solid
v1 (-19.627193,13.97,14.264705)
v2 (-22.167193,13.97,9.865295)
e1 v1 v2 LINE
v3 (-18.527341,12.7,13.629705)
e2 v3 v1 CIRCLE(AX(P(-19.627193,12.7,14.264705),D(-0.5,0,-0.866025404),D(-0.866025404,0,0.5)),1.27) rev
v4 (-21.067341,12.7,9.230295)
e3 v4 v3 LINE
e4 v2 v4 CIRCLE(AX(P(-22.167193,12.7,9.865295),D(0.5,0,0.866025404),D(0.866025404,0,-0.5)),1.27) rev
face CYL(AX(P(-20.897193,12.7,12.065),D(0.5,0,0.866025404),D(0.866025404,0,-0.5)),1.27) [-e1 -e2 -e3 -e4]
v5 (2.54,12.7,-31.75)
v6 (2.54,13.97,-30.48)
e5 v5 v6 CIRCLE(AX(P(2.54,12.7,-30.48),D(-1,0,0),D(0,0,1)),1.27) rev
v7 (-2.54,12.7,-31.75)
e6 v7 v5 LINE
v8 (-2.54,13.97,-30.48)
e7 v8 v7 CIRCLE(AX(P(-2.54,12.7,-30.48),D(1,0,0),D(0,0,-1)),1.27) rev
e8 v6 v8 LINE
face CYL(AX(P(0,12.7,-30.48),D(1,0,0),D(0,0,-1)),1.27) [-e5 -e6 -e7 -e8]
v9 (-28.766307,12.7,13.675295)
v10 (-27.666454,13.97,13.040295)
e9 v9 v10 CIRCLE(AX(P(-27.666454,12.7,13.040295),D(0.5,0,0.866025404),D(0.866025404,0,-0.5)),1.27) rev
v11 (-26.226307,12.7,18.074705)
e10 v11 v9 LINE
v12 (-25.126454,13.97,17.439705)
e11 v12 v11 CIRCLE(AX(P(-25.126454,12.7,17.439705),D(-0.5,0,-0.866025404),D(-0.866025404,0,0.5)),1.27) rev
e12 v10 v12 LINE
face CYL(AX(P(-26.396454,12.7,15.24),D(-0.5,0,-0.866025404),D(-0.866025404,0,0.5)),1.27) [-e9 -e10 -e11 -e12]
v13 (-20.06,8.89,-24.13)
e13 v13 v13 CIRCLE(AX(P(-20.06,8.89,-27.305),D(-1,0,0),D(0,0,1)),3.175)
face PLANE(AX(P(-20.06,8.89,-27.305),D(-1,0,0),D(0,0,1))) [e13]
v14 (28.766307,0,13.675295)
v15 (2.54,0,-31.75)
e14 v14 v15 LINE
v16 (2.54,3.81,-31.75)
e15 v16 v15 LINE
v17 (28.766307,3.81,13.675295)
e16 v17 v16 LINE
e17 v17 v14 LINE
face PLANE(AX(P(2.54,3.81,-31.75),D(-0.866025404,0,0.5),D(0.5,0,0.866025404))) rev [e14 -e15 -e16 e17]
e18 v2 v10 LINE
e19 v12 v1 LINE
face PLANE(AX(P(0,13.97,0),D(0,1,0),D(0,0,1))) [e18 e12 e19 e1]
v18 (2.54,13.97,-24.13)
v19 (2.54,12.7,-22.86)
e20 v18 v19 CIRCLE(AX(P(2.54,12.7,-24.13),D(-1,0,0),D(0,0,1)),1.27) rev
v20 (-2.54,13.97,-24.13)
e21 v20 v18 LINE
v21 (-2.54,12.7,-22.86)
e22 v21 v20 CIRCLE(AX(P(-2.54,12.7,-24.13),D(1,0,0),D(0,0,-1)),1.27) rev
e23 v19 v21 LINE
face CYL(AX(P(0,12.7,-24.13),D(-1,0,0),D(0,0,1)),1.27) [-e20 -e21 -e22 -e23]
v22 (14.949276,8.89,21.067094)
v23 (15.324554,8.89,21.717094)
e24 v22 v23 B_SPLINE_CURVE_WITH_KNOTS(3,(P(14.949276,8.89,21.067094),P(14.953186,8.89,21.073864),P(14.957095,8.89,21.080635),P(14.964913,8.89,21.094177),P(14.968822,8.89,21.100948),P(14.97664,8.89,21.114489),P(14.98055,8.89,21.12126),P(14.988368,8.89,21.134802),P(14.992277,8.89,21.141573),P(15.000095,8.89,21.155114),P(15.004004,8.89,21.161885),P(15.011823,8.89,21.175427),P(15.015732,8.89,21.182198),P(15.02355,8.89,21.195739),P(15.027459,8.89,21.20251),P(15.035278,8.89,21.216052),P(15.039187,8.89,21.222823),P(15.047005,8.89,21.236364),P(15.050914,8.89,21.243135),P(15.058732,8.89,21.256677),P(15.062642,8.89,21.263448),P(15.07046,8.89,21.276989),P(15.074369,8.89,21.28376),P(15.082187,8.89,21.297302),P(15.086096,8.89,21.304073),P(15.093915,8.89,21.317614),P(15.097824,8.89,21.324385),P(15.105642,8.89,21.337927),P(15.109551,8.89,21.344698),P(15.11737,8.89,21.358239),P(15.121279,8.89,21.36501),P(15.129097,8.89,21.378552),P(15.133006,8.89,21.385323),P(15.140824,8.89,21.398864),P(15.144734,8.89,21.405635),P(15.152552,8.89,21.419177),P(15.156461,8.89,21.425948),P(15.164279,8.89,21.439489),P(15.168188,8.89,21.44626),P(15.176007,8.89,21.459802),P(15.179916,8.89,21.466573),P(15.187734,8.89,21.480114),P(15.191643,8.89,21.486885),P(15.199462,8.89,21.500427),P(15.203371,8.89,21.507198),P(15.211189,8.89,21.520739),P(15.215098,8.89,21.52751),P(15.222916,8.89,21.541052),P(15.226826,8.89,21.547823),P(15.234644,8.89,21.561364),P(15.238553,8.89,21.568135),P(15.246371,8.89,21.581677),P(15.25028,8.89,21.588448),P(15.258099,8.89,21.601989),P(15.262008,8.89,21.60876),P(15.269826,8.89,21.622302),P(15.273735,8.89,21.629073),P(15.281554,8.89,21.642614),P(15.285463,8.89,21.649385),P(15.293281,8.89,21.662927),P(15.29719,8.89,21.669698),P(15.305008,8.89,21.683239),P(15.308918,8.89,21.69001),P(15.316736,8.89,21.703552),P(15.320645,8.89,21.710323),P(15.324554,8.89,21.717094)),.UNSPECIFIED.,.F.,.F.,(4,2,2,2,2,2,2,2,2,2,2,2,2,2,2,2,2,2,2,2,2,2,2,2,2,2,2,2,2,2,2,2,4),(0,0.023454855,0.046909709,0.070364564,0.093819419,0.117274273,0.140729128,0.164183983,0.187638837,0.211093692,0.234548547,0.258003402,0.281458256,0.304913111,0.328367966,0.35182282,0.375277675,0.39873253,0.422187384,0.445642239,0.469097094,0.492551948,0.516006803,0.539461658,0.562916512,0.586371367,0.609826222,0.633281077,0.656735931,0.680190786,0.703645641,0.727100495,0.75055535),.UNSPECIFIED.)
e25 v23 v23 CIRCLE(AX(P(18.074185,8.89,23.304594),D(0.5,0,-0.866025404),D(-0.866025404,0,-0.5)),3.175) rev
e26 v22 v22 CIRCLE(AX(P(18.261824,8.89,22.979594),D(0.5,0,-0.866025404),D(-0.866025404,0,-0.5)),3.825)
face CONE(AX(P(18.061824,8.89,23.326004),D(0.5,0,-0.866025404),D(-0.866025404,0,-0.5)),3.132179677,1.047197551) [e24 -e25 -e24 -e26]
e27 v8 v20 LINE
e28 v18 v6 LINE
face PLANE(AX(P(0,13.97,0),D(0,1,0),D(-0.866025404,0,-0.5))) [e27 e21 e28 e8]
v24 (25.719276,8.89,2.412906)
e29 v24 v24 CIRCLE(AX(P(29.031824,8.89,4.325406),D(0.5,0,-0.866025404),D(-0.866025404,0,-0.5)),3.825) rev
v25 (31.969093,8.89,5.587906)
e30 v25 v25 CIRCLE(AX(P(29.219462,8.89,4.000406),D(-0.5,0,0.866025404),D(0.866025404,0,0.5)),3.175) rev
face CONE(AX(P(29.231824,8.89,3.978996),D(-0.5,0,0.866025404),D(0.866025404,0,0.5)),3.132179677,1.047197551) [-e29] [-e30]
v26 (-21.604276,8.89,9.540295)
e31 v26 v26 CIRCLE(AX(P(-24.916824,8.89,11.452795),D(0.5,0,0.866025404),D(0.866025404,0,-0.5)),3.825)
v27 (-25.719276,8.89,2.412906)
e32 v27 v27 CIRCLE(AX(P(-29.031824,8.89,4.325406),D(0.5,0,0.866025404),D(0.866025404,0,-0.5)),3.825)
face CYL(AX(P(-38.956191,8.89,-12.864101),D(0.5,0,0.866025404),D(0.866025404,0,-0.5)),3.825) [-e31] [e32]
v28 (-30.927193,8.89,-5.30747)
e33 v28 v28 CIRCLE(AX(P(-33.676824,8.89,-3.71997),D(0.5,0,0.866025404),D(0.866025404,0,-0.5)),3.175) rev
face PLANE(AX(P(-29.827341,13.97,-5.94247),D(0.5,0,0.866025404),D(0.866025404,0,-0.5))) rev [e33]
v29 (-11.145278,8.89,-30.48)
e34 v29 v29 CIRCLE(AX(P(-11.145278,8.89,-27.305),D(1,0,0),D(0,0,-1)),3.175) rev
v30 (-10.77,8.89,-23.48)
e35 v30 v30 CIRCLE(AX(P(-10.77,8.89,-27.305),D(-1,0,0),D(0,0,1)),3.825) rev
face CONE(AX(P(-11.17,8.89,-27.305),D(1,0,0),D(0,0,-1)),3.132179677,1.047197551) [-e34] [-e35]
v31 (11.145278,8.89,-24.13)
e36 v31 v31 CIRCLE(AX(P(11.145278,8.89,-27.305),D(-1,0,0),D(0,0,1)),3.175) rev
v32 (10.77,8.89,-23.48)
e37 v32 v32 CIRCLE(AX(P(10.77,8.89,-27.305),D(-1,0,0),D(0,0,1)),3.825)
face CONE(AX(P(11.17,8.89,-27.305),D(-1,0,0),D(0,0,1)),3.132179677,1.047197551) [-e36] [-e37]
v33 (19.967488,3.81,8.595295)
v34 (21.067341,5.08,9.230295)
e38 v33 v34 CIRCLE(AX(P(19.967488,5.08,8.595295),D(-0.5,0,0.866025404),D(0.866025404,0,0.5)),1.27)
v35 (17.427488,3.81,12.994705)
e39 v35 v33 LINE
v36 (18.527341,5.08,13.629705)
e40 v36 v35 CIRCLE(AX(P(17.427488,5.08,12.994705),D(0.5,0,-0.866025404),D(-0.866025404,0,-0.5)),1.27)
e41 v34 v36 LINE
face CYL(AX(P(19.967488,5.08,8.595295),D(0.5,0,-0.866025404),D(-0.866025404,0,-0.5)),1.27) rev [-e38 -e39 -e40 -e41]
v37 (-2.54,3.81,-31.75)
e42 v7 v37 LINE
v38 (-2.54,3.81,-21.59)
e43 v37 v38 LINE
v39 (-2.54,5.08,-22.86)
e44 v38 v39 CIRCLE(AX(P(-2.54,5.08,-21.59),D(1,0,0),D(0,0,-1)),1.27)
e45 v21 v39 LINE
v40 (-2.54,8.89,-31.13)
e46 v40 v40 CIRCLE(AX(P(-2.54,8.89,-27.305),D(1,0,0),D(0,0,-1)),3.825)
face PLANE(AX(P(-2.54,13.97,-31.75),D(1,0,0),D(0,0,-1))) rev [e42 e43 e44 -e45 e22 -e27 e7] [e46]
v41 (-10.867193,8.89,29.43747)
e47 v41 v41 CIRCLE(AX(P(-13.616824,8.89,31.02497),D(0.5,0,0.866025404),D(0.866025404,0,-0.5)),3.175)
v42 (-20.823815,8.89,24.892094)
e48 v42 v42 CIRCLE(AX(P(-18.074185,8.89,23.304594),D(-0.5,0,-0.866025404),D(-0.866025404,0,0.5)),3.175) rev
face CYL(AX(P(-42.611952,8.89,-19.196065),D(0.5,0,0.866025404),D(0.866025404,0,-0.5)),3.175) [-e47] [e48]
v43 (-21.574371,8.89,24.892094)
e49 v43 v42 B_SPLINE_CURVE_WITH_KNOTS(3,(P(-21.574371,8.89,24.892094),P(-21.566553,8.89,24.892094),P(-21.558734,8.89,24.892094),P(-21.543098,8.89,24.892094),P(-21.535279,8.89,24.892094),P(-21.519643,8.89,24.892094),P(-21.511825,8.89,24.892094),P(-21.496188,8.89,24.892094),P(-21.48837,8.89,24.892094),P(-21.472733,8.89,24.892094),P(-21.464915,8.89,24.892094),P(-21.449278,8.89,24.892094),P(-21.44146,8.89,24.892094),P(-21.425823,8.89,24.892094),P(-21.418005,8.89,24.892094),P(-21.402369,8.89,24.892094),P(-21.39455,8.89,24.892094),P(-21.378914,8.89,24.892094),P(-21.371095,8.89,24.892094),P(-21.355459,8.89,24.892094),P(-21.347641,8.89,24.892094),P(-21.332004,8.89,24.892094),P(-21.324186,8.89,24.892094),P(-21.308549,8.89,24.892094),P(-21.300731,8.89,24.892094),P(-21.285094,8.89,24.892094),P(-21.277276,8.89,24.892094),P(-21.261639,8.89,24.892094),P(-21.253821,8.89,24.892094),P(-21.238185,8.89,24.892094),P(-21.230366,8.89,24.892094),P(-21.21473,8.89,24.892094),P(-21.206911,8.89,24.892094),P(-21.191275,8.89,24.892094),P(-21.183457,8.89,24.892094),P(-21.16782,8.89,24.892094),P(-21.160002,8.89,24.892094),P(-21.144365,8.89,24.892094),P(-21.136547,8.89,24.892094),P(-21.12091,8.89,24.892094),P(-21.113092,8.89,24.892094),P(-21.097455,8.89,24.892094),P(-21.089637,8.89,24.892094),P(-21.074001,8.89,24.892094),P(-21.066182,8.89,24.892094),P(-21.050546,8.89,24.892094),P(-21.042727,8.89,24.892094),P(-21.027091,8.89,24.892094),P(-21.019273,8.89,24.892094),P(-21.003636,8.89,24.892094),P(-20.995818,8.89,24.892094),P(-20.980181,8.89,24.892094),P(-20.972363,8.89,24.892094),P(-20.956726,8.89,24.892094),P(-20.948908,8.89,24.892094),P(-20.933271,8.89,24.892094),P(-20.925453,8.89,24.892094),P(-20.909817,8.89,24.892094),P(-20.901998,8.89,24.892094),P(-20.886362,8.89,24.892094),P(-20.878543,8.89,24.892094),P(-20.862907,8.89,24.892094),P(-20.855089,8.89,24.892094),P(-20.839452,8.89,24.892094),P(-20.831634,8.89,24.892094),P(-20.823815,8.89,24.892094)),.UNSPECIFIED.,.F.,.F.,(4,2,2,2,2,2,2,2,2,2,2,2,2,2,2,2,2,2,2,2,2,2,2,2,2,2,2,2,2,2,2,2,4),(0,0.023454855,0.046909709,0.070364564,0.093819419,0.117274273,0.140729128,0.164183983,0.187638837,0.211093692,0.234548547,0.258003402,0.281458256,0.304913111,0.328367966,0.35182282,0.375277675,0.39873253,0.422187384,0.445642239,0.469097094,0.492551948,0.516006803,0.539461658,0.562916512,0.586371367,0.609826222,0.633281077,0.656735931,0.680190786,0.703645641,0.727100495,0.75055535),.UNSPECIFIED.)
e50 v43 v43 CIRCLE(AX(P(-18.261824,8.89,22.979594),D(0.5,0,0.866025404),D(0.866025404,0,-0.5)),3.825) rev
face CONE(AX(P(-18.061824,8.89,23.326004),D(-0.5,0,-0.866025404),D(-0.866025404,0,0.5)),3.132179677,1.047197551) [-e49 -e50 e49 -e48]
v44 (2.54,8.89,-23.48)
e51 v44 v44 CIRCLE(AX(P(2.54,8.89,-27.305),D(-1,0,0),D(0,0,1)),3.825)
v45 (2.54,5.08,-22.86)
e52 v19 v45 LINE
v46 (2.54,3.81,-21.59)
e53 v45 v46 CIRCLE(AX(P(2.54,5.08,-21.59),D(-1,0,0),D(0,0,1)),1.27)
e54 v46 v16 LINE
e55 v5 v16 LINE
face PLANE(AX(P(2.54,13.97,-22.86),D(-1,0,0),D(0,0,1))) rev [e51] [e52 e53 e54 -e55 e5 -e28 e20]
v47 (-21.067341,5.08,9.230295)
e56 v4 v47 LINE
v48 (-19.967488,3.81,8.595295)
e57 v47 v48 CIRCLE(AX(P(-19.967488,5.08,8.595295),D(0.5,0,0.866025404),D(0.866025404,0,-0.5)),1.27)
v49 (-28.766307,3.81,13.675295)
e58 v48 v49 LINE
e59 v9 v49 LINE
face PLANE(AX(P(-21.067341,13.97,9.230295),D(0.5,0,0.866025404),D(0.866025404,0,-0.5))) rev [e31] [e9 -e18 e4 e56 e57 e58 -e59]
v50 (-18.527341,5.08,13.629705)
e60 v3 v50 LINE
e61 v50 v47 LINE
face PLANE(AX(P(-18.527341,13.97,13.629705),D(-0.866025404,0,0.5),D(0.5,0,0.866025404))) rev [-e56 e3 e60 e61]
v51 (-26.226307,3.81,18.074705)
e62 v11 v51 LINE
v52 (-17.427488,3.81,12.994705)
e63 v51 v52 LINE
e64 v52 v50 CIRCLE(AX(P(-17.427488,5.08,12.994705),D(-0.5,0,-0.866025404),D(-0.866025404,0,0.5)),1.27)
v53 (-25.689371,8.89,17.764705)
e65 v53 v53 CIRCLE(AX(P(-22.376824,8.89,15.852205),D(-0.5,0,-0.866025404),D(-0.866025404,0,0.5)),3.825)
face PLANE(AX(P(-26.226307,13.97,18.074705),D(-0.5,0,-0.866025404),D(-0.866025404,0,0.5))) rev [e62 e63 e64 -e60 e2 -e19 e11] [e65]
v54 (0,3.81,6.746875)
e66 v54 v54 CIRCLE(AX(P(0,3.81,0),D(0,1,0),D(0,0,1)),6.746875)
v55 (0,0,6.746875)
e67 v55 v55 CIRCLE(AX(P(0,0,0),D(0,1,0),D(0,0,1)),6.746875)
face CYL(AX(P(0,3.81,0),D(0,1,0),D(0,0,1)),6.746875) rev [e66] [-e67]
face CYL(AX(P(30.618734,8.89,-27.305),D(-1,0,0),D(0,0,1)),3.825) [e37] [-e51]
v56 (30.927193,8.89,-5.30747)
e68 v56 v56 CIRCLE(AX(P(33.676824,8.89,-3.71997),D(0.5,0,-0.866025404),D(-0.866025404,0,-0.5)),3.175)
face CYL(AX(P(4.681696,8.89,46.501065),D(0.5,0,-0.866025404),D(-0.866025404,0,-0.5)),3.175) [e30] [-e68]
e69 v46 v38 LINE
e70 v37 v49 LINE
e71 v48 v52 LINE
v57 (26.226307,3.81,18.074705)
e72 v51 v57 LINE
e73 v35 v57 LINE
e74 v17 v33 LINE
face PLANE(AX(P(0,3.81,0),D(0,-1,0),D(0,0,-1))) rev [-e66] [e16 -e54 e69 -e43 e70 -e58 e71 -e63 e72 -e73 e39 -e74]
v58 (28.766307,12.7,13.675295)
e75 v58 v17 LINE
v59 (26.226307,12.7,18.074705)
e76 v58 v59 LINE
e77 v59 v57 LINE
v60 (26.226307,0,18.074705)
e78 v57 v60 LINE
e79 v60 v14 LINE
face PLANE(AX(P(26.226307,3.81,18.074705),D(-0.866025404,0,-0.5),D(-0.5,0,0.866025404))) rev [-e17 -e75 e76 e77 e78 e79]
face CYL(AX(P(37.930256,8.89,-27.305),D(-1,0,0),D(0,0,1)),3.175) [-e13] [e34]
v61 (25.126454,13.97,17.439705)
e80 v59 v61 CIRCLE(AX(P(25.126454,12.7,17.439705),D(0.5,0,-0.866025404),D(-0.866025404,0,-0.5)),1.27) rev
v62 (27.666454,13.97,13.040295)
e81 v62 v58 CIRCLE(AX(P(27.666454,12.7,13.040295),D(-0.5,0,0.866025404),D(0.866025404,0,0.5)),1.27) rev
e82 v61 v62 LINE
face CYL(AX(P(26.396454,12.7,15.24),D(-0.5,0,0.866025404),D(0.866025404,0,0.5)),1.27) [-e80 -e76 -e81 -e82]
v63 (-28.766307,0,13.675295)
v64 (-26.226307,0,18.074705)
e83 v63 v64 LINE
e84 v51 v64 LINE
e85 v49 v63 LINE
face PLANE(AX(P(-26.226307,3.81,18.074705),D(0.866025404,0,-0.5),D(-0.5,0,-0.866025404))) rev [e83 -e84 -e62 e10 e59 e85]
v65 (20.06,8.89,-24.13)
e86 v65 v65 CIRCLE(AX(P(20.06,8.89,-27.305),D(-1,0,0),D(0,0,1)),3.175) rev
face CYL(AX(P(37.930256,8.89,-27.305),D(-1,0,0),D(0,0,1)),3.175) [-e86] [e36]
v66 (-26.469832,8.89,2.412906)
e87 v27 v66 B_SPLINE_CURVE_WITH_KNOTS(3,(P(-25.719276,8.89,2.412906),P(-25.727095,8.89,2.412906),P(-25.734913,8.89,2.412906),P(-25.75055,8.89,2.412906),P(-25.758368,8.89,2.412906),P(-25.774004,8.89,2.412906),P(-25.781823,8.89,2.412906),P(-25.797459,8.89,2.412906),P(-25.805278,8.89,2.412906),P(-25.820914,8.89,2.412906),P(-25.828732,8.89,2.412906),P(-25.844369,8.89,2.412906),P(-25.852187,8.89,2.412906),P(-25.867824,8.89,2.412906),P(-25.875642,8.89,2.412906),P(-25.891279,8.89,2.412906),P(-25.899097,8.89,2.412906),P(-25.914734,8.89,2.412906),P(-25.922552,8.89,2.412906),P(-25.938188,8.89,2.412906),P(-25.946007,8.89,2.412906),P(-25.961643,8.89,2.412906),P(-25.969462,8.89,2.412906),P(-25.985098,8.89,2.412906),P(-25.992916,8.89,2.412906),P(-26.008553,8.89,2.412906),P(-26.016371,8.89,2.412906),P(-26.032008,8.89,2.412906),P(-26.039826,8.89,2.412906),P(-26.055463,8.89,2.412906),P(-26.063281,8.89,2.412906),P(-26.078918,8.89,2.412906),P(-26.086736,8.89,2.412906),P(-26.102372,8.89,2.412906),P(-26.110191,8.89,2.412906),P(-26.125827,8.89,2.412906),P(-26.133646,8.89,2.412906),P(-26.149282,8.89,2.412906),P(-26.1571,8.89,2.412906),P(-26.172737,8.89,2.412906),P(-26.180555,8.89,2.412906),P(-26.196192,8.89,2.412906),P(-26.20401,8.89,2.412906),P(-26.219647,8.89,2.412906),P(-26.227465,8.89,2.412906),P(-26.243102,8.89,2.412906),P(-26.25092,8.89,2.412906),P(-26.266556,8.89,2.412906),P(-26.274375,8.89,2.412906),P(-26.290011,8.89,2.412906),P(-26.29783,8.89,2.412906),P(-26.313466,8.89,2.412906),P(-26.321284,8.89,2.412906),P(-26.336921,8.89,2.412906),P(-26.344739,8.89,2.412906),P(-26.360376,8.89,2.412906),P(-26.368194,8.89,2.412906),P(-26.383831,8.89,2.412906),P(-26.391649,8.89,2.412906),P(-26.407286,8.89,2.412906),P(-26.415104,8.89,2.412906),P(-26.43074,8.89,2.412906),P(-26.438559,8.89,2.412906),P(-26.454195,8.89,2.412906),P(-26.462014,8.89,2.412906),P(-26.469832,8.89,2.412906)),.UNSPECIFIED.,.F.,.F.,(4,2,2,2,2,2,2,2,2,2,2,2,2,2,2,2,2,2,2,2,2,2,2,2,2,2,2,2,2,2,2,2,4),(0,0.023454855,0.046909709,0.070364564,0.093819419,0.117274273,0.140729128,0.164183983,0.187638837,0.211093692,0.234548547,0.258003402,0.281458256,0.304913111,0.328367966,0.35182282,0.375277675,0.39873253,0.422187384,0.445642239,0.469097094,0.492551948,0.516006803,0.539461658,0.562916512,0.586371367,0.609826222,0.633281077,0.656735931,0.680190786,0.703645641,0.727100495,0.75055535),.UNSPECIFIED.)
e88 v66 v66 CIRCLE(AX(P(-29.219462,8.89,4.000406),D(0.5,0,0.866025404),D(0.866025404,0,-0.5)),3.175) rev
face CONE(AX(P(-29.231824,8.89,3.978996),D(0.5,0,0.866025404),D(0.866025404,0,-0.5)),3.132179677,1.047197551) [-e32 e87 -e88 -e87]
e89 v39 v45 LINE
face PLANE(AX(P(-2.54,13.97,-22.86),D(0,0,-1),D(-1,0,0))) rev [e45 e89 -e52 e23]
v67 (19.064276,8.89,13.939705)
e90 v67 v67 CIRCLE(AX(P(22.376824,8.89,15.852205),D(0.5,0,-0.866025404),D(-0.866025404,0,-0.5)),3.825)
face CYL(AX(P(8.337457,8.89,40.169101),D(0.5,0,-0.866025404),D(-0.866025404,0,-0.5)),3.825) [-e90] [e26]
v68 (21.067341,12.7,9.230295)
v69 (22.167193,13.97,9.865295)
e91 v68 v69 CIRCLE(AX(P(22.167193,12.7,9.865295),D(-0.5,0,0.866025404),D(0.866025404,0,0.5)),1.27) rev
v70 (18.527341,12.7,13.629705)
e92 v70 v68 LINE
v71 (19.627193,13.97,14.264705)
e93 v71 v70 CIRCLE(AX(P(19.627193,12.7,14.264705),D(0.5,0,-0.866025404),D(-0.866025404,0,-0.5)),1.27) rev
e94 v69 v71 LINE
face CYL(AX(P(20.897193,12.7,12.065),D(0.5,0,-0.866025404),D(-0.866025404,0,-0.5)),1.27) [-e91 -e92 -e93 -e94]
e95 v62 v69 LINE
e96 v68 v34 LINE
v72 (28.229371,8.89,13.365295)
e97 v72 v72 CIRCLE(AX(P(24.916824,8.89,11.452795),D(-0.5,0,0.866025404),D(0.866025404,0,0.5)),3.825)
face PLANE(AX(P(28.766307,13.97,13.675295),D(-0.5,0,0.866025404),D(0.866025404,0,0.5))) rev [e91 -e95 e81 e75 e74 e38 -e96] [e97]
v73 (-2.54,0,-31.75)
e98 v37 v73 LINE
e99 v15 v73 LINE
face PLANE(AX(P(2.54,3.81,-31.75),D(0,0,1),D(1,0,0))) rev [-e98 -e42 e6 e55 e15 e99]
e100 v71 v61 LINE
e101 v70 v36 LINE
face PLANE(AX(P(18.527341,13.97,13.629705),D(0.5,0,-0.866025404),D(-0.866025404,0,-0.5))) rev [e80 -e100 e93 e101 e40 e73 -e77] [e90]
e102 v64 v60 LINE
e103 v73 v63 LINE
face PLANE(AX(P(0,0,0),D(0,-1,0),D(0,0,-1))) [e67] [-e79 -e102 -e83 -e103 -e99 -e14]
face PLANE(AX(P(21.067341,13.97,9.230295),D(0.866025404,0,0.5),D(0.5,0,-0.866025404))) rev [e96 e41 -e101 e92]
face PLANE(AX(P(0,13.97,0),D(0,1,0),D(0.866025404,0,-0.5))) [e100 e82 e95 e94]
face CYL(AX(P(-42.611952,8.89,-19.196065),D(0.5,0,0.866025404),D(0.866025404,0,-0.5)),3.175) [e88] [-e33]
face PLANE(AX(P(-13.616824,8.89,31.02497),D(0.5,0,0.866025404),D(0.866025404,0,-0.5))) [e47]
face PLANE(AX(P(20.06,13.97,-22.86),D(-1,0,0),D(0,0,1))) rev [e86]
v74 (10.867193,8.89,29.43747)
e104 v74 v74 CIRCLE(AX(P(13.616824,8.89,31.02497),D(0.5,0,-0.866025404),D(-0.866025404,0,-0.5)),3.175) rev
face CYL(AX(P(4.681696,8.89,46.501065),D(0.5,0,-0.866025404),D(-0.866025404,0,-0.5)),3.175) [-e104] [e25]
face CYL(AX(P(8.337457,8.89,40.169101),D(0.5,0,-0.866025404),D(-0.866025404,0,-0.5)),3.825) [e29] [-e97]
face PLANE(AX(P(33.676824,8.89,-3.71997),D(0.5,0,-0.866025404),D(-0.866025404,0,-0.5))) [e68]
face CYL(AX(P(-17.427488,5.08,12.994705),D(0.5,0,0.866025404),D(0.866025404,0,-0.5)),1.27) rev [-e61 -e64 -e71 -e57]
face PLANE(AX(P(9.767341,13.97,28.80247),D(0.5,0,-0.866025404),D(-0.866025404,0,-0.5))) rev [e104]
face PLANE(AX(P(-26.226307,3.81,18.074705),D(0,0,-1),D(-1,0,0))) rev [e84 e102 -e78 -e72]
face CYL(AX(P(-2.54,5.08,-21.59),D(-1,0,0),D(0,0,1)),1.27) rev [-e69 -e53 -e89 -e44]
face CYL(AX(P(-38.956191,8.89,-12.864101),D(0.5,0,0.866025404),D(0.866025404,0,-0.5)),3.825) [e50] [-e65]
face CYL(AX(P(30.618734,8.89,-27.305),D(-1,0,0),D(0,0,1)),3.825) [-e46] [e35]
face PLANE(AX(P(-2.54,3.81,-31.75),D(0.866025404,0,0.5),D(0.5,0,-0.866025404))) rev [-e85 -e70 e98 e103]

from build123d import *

# Parameters (mm, degrees)
BOSS_EXTRUDE1_DEPTH              = 3.81
F_17_32_0_53125_DIAMETER_HOLE1_D = 13.49375
BOSS_EXTRUDE2_DEPTH              = 10.16
CIRPATTERN19_COUNT               = 3
BOSS_EXTRUDE3_START              = -13.71
SKETCH6_R                        = 3.825
BOSS_EXTRUDE3_DEPTH              = 22.34
BOSS_EXTRUDE4_START              = -31.23
SKETCH7_R                        = 3.175
BOSS_EXTRUDE4_DEPTH              = 40.12
CIRPATTERN21_COUNT               = 3
CIRPATTERN28_COUNT               = 3
CHAMFER3_SIZE                    = 0.4
CHAMFER3_SIZE_2                  = 0.692820323
FILLET4_R                        = 1.27


with BuildPart() as part:
    # Sketch1 → Boss-Extrude1 (new body)
    with BuildSketch(Plane(origin=(0, 0, 0), x_dir=(1, 0, 0), z_dir=(0, 1, 0))):
        Polygon((2.54, 31.75), (-2.54, 31.75), (-28.76630657, -13.675295474), (-26.22630657, -18.074704526), (26.22630657, -18.074704526), (28.76630657, -13.675295474), align=None)
    extrude(amount=BOSS_EXTRUDE1_DEPTH)

    # 17/32 (0.53125) Diameter Hole1 (through all)
    with Locations(Plane(origin=(-6.6e-08, 3.81, -3.86e-07), x_dir=(0, 0, 1), z_dir=(0, 1, 0))):
        with Locations((0, 0)):
            Hole(F_17_32_0_53125_DIAMETER_HOLE1_D / 2)

    # Sketch5 → Boss-Extrude2 (add)
    with BuildSketch(Plane(origin=(0, 3.81, 0), x_dir=(1, 0, 0), z_dir=(0, 1, 0))):
        Polygon((-21.067340731, -9.230295474), (-28.76630657, -13.675295474), (-26.22630657, -18.074704526), (-18.527340731, -13.629704526), align=None)
    boss_extrude2 = extrude(amount=BOSS_EXTRUDE2_DEPTH)

    # CirPattern19: Boss-Extrude2 ×3 about axis
    cirpattern19_axis = Axis((0, 0, 0), (0, 1, 0))
    for i in range(1, CIRPATTERN19_COUNT):
        add(boss_extrude2.rotate(cirpattern19_axis, i * 360 / CIRPATTERN19_COUNT))

    # Sketch6 → Boss-Extrude3 (add)
    with BuildSketch(Plane(origin=(1.27, 0, 2.199704526), x_dir=(0.8660254037844383, 0, -0.5000000000000007), z_dir=(0.5000000000000007, 0, 0.8660254037844383)).offset(BOSS_EXTRUDE3_START)):
        with Locations((-27.305, 8.89)):
            Circle(SKETCH6_R)
    boss_extrude3 = extrude(amount=BOSS_EXTRUDE3_DEPTH)

    # Sketch7 → Boss-Extrude4 (add)
    with BuildSketch(Plane(origin=(5.585, 0, 9.67350376), x_dir=(0.8660254037844384, 0, -0.5000000000000007), z_dir=(0.5000000000000007, 0, 0.8660254037844384)).offset(BOSS_EXTRUDE4_START)):
        with Locations((-27.305, 8.89)):
            Circle(SKETCH7_R)
    boss_extrude4 = extrude(amount=BOSS_EXTRUDE4_DEPTH)

    # CirPattern21: Boss-Extrude3 ×3 about axis
    cirpattern21_axis = Axis((0, 0, 0), (0, 1, 0))
    for i in range(1, CIRPATTERN21_COUNT):
        add(boss_extrude3.rotate(cirpattern21_axis, i * 360 / CIRPATTERN21_COUNT))

    # CirPattern28: Boss-Extrude4 ×3 about axis
    cirpattern28_axis = Axis((0, 0, 0), (0, 1, 0))
    for i in range(1, CIRPATTERN28_COUNT):
        add(boss_extrude4.rotate(cirpattern28_axis, i * 360 / CIRPATTERN28_COUNT))

    # Chamfer3
    # the kernel refuses this chamfer: 0.692820323, 0.4 mm, written as the material it takes off along each edge
    with BuildSketch(Plane(origin=(-18.06182365, 8.89, 23.32600376), x_dir=(0.8660254037844383, 0, -0.5000000000000004), z_dir=(0, -1, 0))) as chamfer3_piece_1_section:
        Polygon((3.825, -CHAMFER3_SIZE), (3.825 - CHAMFER3_SIZE_2, 0), (3.825, 0), align=None)
    chamfer3_piece_1 = revolve(axis=Axis((-18.06182365, 8.89, 23.32600376), (0.5000000000000007, 0, 0.8660254037844383)), mode=Mode.PRIVATE)
    chamfer3_piece_1 = chamfer3_piece_1 - Plane(origin=(-18.164887991, 8.89, 23.147491086), x_dir=(0.8660254037844384, 0, -0.5000000000000007), z_dir=(-0.5000000000000007, 0, -0.8660254037844384)) * Cylinder(3.175, 16, mode=Mode.PRIVATE)
    add(chamfer3_piece_1, mode=Mode.SUBTRACT)
    with BuildSketch(Plane(origin=(-11.17, 8.89, -27.305), x_dir=(0, 0, 1), z_dir=(0, -1, 0))) as chamfer3_piece_2_section:
        Polygon((3.825, -CHAMFER3_SIZE), (3.825 - CHAMFER3_SIZE_2, 0), (3.825, 0), align=None)
    chamfer3_piece_2 = revolve(axis=Axis((-11.17, 8.89, -27.305), (-1, 0, 0)), mode=Mode.PRIVATE)
    chamfer3_piece_2 = chamfer3_piece_2 - Plane(origin=(-10.963871319, 8.89, -27.305), x_dir=(0, 0, 1), z_dir=(1, 0, 0)) * Cylinder(3.175, 16, mode=Mode.PRIVATE)
    add(chamfer3_piece_2, mode=Mode.SUBTRACT)
    with BuildSketch(Plane(origin=(11.17, 8.89, -27.305), x_dir=(0, 0, 1), z_dir=(0, -1, 0))) as chamfer3_piece_3_section:
        Polygon((3.825, CHAMFER3_SIZE), (3.825 - CHAMFER3_SIZE_2, 0), (3.825, 0), align=None)
    chamfer3_piece_3 = revolve(axis=Axis((11.17, 8.89, -27.305), (-1, 0, 0)), mode=Mode.PRIVATE)
    chamfer3_piece_3 = chamfer3_piece_3 - Plane(origin=(10.963871319, 8.89, -27.305), x_dir=(0, 0, 1), z_dir=(1, 0, 0)) * Cylinder(3.175, 16, mode=Mode.PRIVATE)
    add(chamfer3_piece_3, mode=Mode.SUBTRACT)
    with BuildSketch(Plane(origin=(29.23182365, 8.89, 3.97899624), x_dir=(-0.8660254037844392, 0, -0.49999999999999906), z_dir=(0, -1, 0))) as chamfer3_piece_4_section:
        Polygon((3.825, -CHAMFER3_SIZE), (3.825 - CHAMFER3_SIZE_2, 0), (3.825, 0), align=None)
    chamfer3_piece_4 = revolve(axis=Axis((29.23182365, 8.89, 3.97899624), (0.4999999999999995, 0, -0.8660254037844389)), mode=Mode.PRIVATE)
    chamfer3_piece_4 = chamfer3_piece_4 - Plane(origin=(29.12875931, 8.89, 4.157508914), x_dir=(-0.8660254037844389, 0, -0.49999999999999956), z_dir=(-0.49999999999999956, 0, 0.8660254037844389)) * Cylinder(3.175, 16, mode=Mode.PRIVATE)
    add(chamfer3_piece_4, mode=Mode.SUBTRACT)
    with BuildSketch(Plane(origin=(18.06182365, 8.89, 23.32600376), x_dir=(-0.8660254037844394, 0, -0.49999999999999895), z_dir=(0, -1, 0))) as chamfer3_piece_5_section:
        Polygon((3.825, CHAMFER3_SIZE), (3.825 - CHAMFER3_SIZE_2, 0), (3.825, 0), align=None)
    chamfer3_piece_5 = revolve(axis=Axis((18.06182365, 8.89, 23.32600376), (0.4999999999999995, 0, -0.8660254037844389)), mode=Mode.PRIVATE)
    chamfer3_piece_5 = chamfer3_piece_5 - Plane(origin=(18.164887991, 8.89, 23.147491086), x_dir=(-0.8660254037844389, 0, -0.49999999999999956), z_dir=(-0.49999999999999956, 0, 0.8660254037844389)) * Cylinder(3.175, 16, mode=Mode.PRIVATE)
    add(chamfer3_piece_5, mode=Mode.SUBTRACT)
    with BuildSketch(Plane(origin=(-29.23182365, 8.89, 3.97899624), x_dir=(0.8660254037844383, 0, -0.5000000000000004), z_dir=(0, -1, 0))) as chamfer3_piece_6_section:
        Polygon((3.825, CHAMFER3_SIZE), (3.825 - CHAMFER3_SIZE_2, 0), (3.825, 0), align=None)
    chamfer3_piece_6 = revolve(axis=Axis((-29.23182365, 8.89, 3.97899624), (0.5000000000000007, 0, 0.8660254037844383)), mode=Mode.PRIVATE)
    chamfer3_piece_6 = chamfer3_piece_6 - Plane(origin=(-29.12875931, 8.89, 4.157508914), x_dir=(0.8660254037844384, 0, -0.5000000000000007), z_dir=(-0.5000000000000007, 0, -0.8660254037844384)) * Cylinder(3.175, 16, mode=Mode.PRIVATE)
    add(chamfer3_piece_6, mode=Mode.SUBTRACT)

    # Fillet4
    fillet4_edges = [part.edges().sort_by_distance(p)[0] for p in [
        (-19.797340731, 3.81, 11.43),
        (-27.49630657, 13.97, 15.875),
        (-19.797340731, 13.97, 11.43),
        (19.797340731, 3.81, 11.43),
        (27.49630657, 13.97, 15.875),
        (19.797340731, 13.97, 11.43),
        (0, 3.81, -22.86),
        (0, 13.97, -31.75),
        (0, 13.97, -22.86),
    ]]
    fillet(fillet4_edges, radius=FILLET4_R)


solid = part.part
